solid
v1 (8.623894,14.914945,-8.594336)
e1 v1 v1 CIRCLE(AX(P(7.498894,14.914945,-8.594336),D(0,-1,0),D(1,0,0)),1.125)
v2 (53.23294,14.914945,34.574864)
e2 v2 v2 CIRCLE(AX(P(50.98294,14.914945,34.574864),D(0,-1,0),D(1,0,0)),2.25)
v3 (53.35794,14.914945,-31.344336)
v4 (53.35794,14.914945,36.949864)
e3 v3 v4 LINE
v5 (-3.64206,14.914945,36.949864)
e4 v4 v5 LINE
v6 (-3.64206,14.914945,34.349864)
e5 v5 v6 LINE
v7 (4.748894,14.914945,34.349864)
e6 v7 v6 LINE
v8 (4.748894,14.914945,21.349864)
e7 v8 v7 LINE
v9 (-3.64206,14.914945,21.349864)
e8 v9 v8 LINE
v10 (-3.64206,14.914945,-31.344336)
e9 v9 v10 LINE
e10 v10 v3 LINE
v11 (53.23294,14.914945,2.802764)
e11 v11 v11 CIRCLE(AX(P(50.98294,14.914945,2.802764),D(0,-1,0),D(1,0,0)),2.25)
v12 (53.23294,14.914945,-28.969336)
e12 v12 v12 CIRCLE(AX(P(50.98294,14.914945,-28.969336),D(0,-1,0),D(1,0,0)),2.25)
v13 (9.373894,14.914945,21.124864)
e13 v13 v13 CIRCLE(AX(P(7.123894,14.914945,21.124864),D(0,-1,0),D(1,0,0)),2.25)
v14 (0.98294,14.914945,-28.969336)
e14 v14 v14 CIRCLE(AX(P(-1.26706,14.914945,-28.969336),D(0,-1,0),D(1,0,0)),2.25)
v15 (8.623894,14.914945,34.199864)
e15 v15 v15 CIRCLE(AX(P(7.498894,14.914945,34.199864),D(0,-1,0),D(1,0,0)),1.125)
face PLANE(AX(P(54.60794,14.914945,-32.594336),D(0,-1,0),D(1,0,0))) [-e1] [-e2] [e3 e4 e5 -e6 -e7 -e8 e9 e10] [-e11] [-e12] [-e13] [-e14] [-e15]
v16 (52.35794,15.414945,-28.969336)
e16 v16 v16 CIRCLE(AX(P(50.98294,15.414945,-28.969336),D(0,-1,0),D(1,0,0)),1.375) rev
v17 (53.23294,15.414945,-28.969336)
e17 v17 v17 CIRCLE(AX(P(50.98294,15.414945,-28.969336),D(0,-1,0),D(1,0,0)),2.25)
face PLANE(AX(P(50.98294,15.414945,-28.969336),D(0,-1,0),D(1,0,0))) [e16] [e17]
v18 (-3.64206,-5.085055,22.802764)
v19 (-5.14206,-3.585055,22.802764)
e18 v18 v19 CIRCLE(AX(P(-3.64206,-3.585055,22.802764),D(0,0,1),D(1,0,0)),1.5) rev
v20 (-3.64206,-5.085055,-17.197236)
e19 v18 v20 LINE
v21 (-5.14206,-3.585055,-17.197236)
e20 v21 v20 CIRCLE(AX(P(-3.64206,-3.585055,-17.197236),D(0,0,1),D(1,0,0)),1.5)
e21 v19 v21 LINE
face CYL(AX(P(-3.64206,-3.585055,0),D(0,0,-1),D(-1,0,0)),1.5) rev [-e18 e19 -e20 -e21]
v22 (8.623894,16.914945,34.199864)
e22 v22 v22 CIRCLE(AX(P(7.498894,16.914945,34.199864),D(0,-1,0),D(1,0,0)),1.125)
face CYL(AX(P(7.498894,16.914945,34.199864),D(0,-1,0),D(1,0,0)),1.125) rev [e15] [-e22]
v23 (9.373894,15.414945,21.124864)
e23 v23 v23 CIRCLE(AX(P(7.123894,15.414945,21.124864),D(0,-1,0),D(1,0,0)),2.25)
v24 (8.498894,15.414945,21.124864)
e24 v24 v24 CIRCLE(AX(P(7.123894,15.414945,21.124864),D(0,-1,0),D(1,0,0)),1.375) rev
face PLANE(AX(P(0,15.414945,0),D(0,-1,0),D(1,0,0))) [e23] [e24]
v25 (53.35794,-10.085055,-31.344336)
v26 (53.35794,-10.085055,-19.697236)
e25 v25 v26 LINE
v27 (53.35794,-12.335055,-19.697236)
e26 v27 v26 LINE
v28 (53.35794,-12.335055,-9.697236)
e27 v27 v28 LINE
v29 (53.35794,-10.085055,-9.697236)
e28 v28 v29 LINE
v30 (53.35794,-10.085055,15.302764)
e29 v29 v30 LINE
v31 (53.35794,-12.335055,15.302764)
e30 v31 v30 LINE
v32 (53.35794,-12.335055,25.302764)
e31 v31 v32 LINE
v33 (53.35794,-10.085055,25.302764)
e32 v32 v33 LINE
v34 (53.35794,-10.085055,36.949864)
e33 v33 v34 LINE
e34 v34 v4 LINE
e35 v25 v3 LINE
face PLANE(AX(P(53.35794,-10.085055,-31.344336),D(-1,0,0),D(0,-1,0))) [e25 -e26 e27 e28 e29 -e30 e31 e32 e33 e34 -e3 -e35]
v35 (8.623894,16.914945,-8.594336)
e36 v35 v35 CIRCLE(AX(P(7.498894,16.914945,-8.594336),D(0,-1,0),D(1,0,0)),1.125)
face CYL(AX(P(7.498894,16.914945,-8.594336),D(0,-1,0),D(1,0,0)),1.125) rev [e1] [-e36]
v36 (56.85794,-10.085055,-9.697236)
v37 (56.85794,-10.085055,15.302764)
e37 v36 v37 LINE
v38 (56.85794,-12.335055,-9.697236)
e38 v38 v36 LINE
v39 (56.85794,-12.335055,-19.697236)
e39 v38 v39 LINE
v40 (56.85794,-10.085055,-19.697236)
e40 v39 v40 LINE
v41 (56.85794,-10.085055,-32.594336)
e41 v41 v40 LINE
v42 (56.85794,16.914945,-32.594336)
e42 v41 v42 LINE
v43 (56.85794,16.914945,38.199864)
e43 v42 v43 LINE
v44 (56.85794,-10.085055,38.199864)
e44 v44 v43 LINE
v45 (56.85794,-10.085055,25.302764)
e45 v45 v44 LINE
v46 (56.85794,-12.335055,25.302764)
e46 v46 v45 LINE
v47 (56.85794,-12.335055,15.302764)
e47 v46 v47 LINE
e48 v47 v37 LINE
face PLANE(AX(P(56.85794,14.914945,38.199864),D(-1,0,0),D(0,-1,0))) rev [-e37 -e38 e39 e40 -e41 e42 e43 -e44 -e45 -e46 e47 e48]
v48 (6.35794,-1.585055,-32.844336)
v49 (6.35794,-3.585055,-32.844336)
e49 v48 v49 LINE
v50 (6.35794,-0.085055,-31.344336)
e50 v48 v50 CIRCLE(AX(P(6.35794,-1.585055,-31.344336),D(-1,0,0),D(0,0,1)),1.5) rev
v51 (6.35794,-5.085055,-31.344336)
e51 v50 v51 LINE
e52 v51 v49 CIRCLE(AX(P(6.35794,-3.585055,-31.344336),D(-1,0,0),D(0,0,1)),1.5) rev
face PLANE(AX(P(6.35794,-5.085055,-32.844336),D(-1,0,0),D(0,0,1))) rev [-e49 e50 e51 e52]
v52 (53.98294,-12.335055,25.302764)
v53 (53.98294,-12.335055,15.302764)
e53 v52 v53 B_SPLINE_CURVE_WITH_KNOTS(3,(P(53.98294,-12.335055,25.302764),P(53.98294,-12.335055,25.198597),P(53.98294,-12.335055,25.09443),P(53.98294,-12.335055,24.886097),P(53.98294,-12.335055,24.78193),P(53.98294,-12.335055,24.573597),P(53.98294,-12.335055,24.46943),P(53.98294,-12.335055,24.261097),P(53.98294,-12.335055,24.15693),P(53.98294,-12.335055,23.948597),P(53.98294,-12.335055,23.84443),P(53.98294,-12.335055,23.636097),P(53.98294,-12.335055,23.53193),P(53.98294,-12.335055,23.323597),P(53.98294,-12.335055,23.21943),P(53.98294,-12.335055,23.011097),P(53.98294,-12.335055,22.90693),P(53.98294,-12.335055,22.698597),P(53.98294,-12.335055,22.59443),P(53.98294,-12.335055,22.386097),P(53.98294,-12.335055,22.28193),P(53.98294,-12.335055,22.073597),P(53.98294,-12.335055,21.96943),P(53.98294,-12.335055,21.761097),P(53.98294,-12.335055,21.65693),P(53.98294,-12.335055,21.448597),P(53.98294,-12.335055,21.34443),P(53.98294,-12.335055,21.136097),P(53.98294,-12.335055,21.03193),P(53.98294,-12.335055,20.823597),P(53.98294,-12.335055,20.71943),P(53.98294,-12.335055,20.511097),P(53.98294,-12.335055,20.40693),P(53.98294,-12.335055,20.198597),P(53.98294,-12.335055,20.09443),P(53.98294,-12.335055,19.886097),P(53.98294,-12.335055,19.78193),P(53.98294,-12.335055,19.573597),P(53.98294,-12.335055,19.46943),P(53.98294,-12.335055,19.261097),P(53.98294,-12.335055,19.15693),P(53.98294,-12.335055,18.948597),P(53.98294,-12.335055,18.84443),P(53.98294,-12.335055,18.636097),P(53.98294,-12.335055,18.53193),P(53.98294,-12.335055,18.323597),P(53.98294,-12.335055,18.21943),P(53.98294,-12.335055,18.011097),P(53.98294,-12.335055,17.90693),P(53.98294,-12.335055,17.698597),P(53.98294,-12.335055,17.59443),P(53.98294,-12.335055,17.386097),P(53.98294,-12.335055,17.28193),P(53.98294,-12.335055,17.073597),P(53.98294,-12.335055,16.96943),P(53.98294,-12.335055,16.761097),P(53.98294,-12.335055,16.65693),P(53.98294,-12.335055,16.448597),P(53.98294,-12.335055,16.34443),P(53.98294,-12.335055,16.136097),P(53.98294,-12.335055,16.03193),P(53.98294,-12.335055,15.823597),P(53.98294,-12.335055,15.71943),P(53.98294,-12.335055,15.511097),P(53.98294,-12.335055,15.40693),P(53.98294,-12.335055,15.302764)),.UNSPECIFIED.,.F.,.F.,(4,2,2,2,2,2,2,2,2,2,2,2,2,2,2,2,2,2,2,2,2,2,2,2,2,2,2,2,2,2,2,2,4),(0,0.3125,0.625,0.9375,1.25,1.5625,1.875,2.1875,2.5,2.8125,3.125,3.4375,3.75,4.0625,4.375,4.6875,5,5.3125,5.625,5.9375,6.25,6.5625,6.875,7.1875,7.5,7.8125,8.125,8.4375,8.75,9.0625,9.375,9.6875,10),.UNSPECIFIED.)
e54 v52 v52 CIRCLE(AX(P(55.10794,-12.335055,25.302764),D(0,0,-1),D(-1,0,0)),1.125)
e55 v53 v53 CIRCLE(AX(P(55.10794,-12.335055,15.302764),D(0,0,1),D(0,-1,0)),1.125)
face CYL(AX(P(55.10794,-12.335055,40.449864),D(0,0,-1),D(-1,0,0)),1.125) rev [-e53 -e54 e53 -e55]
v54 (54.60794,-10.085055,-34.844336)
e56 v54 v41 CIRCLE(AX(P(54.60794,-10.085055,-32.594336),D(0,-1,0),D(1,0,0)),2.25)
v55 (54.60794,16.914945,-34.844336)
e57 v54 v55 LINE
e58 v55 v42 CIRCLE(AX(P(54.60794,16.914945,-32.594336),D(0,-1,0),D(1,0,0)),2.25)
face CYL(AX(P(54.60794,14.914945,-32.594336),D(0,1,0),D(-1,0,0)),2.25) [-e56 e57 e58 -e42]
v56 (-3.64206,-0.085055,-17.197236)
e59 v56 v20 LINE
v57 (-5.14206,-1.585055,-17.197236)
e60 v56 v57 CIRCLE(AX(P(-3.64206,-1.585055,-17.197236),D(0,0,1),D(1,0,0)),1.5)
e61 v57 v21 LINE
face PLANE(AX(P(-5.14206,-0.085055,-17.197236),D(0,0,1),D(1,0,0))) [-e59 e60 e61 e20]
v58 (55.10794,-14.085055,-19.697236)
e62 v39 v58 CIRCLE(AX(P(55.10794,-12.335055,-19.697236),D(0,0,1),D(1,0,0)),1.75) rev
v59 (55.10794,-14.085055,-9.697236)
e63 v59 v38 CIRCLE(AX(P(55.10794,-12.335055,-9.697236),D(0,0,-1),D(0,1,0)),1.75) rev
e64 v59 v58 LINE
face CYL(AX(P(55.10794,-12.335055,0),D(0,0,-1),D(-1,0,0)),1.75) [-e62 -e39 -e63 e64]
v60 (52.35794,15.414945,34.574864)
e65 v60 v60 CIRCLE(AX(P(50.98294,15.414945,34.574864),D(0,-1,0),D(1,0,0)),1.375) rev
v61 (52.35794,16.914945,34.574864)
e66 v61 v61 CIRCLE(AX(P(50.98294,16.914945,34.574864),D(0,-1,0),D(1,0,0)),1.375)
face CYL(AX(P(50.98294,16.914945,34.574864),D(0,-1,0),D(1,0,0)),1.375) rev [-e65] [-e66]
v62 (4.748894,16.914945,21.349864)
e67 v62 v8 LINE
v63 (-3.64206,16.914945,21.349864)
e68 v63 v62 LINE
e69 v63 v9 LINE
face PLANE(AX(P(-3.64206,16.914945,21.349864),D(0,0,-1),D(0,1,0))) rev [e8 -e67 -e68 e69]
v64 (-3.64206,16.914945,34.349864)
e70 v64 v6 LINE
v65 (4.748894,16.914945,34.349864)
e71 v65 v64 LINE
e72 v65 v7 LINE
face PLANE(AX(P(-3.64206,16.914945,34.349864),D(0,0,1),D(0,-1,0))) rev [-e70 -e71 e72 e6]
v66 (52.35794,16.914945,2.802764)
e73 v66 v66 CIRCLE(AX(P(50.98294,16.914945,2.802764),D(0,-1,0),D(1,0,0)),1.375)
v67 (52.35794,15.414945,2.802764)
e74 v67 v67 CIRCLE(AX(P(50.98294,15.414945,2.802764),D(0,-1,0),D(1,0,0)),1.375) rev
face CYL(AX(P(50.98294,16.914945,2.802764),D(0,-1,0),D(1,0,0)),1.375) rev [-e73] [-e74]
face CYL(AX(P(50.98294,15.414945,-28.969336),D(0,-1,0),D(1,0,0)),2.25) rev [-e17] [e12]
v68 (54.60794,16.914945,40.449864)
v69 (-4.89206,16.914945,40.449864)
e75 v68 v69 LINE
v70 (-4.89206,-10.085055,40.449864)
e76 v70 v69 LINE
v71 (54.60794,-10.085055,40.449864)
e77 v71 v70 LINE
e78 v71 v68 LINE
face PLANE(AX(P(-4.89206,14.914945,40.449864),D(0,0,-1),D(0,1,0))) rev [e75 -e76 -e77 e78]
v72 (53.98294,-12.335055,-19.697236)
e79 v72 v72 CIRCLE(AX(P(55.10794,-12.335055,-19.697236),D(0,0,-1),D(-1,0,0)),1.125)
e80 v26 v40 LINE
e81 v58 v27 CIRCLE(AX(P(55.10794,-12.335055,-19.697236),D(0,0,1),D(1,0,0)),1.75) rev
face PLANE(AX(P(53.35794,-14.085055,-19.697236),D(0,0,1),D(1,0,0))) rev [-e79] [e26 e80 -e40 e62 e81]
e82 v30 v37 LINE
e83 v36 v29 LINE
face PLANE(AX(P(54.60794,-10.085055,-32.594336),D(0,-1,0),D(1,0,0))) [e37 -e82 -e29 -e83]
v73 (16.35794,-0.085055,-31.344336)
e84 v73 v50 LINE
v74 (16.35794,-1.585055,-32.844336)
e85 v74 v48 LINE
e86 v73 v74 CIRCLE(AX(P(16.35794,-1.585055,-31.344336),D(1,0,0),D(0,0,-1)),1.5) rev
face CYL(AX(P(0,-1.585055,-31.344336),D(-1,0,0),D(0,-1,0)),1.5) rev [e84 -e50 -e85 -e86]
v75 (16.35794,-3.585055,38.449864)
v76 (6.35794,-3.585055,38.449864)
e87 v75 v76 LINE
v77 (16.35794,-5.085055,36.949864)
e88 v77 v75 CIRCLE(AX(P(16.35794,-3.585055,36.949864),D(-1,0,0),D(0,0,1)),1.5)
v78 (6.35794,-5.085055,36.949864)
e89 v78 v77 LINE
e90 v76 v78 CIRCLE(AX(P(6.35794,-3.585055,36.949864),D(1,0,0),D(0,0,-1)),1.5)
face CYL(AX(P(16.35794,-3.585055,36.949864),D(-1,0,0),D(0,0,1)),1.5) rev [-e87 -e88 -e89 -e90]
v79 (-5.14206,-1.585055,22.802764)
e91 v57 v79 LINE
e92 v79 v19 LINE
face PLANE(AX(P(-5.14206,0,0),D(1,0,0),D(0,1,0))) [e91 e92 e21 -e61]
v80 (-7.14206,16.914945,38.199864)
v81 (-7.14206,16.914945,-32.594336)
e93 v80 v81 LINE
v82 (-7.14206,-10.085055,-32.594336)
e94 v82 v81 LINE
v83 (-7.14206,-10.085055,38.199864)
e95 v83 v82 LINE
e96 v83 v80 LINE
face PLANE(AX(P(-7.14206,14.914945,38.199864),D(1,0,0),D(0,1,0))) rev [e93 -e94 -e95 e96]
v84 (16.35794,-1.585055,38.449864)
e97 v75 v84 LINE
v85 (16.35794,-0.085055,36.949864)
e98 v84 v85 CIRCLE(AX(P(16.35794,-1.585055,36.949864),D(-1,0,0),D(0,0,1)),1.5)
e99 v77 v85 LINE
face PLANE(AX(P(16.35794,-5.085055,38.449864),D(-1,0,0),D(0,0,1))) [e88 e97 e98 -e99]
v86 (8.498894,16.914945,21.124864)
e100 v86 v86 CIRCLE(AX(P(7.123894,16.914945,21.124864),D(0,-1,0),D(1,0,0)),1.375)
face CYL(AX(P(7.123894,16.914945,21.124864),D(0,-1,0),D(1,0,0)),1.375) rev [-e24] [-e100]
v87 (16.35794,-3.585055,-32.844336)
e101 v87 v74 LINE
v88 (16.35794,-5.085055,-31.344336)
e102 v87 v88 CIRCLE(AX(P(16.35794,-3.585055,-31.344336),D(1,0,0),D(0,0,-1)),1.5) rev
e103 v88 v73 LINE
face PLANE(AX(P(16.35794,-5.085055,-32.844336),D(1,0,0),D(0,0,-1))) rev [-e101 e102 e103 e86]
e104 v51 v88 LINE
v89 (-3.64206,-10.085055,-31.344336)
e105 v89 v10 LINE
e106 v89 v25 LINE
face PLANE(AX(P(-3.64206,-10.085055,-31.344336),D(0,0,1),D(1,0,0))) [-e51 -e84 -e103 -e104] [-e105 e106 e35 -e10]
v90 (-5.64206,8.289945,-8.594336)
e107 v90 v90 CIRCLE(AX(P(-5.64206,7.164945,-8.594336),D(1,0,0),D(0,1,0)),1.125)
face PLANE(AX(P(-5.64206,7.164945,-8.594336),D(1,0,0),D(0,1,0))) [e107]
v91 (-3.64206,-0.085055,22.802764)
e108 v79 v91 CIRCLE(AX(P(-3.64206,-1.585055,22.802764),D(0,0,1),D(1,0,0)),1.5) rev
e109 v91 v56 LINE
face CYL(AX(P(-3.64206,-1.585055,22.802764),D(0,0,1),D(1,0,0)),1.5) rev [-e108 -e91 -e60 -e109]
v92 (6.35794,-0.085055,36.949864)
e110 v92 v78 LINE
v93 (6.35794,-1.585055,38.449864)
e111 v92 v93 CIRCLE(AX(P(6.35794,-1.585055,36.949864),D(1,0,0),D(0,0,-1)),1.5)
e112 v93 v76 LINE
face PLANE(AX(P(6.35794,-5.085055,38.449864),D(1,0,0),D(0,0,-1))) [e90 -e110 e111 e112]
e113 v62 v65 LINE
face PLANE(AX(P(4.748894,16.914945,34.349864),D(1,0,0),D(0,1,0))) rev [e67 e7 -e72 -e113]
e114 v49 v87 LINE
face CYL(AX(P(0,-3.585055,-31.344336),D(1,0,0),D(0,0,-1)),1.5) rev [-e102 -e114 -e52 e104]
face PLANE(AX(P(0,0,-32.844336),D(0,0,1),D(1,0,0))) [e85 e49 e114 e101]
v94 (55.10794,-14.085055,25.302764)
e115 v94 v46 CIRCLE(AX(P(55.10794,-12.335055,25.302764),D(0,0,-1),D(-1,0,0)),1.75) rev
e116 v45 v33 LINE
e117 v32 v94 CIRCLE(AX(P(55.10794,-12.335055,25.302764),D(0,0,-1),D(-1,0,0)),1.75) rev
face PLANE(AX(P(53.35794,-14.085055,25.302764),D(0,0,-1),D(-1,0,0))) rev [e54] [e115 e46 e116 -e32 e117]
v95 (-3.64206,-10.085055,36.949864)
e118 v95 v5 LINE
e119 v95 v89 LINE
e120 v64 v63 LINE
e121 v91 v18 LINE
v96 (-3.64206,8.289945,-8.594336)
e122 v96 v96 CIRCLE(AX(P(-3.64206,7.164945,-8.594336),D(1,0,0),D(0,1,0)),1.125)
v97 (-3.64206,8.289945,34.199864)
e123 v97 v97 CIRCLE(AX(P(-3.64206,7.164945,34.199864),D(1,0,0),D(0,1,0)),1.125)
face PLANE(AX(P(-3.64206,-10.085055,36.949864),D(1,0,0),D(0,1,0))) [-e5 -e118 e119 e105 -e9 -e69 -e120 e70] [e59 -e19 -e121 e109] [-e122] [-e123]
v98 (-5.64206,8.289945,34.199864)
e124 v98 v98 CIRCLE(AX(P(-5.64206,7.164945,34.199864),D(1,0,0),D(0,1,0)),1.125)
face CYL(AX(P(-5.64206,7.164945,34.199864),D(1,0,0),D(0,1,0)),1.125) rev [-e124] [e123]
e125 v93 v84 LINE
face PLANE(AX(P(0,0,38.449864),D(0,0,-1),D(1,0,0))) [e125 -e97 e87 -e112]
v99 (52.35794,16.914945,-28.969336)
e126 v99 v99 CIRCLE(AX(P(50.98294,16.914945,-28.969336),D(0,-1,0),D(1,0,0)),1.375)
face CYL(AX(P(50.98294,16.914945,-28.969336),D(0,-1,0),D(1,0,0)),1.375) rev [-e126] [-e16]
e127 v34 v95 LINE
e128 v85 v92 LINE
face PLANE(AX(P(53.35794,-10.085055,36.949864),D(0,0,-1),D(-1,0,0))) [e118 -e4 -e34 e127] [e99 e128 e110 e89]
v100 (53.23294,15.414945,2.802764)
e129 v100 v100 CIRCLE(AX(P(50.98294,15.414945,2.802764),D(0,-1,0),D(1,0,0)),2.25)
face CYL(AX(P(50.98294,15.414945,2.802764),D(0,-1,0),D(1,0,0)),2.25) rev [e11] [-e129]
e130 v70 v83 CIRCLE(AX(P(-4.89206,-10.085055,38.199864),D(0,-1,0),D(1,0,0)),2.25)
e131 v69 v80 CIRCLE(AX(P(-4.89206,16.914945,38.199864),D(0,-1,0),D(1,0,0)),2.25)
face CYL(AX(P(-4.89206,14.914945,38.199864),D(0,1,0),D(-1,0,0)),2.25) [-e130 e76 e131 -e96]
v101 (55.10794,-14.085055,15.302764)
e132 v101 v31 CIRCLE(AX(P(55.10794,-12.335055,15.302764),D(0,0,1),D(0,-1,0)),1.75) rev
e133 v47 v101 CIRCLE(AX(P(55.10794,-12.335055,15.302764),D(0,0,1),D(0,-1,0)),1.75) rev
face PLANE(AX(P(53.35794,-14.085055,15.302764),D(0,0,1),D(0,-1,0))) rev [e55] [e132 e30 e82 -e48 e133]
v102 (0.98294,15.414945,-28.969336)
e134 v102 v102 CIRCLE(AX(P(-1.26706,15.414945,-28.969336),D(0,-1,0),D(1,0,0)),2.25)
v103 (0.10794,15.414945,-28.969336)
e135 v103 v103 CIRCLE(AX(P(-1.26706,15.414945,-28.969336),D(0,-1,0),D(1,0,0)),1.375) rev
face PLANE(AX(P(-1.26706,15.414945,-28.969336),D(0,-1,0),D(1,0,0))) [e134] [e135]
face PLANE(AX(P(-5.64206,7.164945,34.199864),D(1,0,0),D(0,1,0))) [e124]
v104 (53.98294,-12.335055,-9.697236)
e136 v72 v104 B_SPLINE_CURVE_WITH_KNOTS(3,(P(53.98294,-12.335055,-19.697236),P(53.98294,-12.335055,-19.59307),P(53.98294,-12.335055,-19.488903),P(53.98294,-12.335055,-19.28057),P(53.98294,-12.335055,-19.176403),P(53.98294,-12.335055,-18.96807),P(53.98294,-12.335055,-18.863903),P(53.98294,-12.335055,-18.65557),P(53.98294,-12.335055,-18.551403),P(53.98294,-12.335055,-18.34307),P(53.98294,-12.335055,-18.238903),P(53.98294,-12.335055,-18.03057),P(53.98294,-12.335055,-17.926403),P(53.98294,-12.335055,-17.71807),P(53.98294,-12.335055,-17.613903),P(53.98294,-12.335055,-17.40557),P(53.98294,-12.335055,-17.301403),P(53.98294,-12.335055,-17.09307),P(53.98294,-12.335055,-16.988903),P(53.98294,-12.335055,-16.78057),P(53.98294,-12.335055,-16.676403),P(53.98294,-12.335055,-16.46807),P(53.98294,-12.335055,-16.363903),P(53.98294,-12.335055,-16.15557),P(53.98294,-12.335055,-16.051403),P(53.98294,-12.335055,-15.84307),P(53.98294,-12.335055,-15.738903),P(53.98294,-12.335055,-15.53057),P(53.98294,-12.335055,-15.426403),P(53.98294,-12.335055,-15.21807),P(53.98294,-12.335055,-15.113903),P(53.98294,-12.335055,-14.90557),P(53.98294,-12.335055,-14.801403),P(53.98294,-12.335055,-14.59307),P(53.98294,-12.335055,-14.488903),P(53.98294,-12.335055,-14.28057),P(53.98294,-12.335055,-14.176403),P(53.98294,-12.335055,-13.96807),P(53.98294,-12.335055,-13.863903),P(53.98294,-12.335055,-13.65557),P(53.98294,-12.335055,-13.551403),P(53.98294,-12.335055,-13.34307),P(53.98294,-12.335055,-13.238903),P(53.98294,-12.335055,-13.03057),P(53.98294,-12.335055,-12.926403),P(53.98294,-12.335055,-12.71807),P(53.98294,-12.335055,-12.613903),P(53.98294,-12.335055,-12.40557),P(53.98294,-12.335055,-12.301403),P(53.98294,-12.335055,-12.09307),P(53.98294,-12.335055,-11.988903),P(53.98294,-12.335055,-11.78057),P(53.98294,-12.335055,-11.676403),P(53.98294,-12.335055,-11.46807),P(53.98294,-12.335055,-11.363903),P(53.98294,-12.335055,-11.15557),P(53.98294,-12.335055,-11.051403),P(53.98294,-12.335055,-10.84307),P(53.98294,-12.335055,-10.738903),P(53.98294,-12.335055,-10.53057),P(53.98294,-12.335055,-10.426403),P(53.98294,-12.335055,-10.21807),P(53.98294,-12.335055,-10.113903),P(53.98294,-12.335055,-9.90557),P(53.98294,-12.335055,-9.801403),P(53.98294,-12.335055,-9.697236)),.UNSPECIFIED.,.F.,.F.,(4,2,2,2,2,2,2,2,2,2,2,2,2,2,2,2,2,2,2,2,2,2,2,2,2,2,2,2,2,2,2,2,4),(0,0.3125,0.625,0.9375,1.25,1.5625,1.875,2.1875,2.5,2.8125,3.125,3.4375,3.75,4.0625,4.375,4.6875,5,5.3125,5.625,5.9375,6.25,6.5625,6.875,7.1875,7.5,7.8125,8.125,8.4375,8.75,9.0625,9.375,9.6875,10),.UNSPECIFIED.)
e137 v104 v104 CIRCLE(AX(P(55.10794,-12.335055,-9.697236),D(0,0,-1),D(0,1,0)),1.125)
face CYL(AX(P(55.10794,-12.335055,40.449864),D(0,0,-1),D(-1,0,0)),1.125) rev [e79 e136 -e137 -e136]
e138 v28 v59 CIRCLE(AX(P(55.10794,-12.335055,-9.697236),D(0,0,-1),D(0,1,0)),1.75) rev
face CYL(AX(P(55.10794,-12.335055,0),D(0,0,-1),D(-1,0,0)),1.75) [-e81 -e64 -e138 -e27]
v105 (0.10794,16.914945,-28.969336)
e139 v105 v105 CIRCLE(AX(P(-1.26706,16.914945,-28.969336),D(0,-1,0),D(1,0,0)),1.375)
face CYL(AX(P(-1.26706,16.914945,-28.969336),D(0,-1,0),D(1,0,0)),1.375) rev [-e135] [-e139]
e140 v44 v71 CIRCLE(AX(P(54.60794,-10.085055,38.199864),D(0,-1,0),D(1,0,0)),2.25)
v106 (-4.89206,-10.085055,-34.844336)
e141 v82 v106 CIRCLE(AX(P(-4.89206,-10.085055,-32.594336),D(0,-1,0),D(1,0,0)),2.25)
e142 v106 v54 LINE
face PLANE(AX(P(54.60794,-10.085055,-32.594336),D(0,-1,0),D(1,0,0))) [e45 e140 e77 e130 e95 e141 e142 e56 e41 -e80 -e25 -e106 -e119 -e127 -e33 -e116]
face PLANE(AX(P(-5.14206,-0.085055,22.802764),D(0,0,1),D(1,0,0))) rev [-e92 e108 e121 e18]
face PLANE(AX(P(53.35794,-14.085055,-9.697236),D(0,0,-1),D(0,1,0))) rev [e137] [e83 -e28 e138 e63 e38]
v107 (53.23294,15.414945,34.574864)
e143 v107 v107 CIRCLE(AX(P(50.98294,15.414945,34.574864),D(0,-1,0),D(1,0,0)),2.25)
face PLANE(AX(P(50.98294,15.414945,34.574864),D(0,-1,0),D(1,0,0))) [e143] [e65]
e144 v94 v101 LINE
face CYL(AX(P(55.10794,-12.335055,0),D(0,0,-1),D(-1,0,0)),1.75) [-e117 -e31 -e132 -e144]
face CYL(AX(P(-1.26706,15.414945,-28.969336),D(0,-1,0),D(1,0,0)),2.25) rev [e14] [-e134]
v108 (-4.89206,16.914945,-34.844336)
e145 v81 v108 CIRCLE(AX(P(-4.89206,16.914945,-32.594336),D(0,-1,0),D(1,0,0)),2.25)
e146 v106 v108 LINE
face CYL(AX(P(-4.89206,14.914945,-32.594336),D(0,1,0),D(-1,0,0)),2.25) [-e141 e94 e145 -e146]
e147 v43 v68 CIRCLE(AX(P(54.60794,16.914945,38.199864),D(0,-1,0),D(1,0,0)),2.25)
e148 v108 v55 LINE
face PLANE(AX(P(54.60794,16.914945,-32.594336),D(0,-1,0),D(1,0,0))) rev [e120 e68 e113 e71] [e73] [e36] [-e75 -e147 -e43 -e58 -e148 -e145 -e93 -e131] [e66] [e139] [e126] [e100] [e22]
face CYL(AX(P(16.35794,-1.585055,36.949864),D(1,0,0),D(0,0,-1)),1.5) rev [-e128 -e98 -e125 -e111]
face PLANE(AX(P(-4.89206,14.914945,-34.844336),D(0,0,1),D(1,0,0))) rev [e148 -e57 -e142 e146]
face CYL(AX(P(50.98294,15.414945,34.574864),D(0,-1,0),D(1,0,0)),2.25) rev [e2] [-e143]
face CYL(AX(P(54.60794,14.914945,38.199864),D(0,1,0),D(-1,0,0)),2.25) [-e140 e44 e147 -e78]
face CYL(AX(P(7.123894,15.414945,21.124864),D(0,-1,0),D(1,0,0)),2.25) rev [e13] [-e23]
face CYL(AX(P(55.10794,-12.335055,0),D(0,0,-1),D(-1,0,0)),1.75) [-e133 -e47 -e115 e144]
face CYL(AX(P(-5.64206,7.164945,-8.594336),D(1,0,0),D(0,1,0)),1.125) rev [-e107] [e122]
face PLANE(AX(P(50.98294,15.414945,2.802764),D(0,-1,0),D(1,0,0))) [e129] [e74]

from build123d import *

# Parameters (mm, degrees)
EXTRUDE_BASE_DEPTH              = 2
SKETCH2_W                       = 57
SKETCH2_H                       = 68.2942
EXTRUDE_WALLS_DEPTH             = 25
SKETCH3_W                       = 8.390953786
SKETCH3_H                       = 13
CUT_USB_HOLE_DEPTH              = 75.121635616
SKETCH4_R                       = 1.375
CUT_CONNECTING_THRU_HOLES_DEPTH = 75.121635616
SKETCH5_R                       = 2.25
SKETCH5_R_2                     = 1.375
CUT_EXTRUDE3_DEPTH              = 0.5
SKETCH6_R                       = 1.125
CUT_CABLE_COVER_BOTTOM_DEPTH    = 75.121635616
SKETCH7_R                       = 1.125
CUT_CABLE_COVER_SIDE_DEPTH      = 2
SKETCH8_W                       = 3.5
SKETCH8_H                       = 10
EXTRUDE_HINGE_DEPTH             = 4
SKETCH9_R                       = 1.125
CUT_HINGE_HOLE_DEPTH            = 85.478484791
FILLET_HINGE_R                  = 1.75
SKETCH10_W                      = 40
SKETCH10_H                      = 5
CUT_NOTCH_DEPTH                 = 1.5
SKETCH11_W                      = 10
SKETCH11_H                      = 5
CUT_SIDE_NOTCH_DEPTH            = 1.5
FILLET_NOTCH_R                  = 1.5


with BuildPart() as part:
    # Sketch1 → Extrude Base (new body)
    with BuildSketch(Plane.XZ.offset(-16.914945084)):
        with BuildLine():
            Line((56.857940404, 38.199863775), (56.857940404, -32.594336225))
            ThreePointArc((56.857940404, -32.594336225), (56.198930662, -34.185326483), (54.607940404, -34.844336225))
            Line((54.607940404, -34.844336225), (-4.892059596, -34.844336225))
            ThreePointArc((-4.892059596, -34.844336225), (-6.483049854, -34.185326483), (-7.142059596, -32.594336225))
            Line((-7.142059596, -32.594336225), (-7.142059596, 38.199863775))
            ThreePointArc((-7.142059596, 38.199863775), (-6.483049854, 39.790854032), (-4.892059596, 40.449863775))
            Line((-4.892059596, 40.449863775), (54.607940404, 40.449863775))
            ThreePointArc((54.607940404, 40.449863775), (56.198930662, 39.790854032), (56.857940404, 38.199863775))
        make_face()
    extrude(amount=EXTRUDE_BASE_DEPTH)

    # Sketch2 → Extrude Walls (add)
    with BuildSketch(Plane.XZ.offset(-14.914945084)):
        with BuildLine():
            Line((56.857940404, -32.594336225), (56.857940404, 38.199863775))
            ThreePointArc((56.857940404, 38.199863775), (56.198930662, 39.790854032), (54.607940404, 40.449863775))
            Line((54.607940404, 40.449863775), (-4.892059596, 40.449863775))
            ThreePointArc((-4.892059596, 40.449863775), (-6.483049854, 39.790854032), (-7.142059596, 38.199863775))
            Line((-7.142059596, 38.199863775), (-7.142059596, -32.594336225))
            ThreePointArc((-7.142059596, -32.594336225), (-6.483049854, -34.185326483), (-4.892059596, -34.844336225))
            Line((-4.892059596, -34.844336225), (54.607940404, -34.844336225))
            ThreePointArc((54.607940404, -34.844336225), (56.198930662, -34.185326483), (56.857940404, -32.594336225))
        make_face()
        with Locations((24.857940404, 2.802763775)):
            Rectangle(SKETCH2_W, SKETCH2_H, mode=Mode.SUBTRACT)
    extrude(amount=EXTRUDE_WALLS_DEPTH)

    # Sketch3 → Cut USB Hole (cut, through all)
    with BuildSketch(Plane.XZ.offset(-14.914945084)):
        with Locations((0.553417297, 27.849863775)):
            Rectangle(SKETCH3_W, SKETCH3_H)
    extrude(amount=-CUT_USB_HOLE_DEPTH, mode=Mode.SUBTRACT)

    # Sketch4 → Cut Connecting Thru Holes (cut, through all)
    with BuildSketch(Plane.XZ.offset(-14.914945084)):
        with Locations((50.982940404, 34.574863775)):
            Circle(SKETCH4_R)
        with Locations((50.982940404, -28.969336225)):
            Circle(SKETCH4_R)
        with Locations((-1.267059596, -28.969336225)):
            Circle(SKETCH4_R)
        with Locations((50.982940404, 2.802763775)):
            Circle(SKETCH4_R)
        with Locations((7.12389419, 21.124863775)):
            Circle(SKETCH4_R)
    extrude(amount=-CUT_CONNECTING_THRU_HOLES_DEPTH, mode=Mode.SUBTRACT)

    # Sketch5 → Cut-Extrude3 (cut)
    # profile 1 of 5: a face of its own
    with BuildSketch(Plane.XZ.offset(-14.914945084)):
        with Locations((7.12389419, 21.124863775)):
            Circle(SKETCH5_R)
        with Locations((7.12389419, 21.124863775)):
            Circle(SKETCH5_R_2, mode=Mode.SUBTRACT)
    # profile 2 of 5: a face of its own
    with BuildSketch(Plane.XZ.offset(-14.914945084)):
        with Locations((50.982940404, 34.574863775)):
            Circle(SKETCH5_R)
    # profile 3 of 5: a face of its own
    with BuildSketch(Plane.XZ.offset(-14.914945084)):
        with Locations((50.982940404, 2.802763775)):
            Circle(SKETCH5_R)
    # profile 4 of 5: a face of its own
    with BuildSketch(Plane.XZ.offset(-14.914945084)):
        with Locations((50.982940404, -28.969336225)):
            Circle(SKETCH5_R)
    # profile 5 of 5: a face of its own
    with BuildSketch(Plane.XZ.offset(-14.914945084)):
        with Locations((-1.267059596, -28.969336225)):
            Circle(SKETCH5_R)
    extrude(amount=-CUT_EXTRUDE3_DEPTH, mode=Mode.SUBTRACT)

    # Sketch6 → Cut Cable Cover Bottom (cut, through all)
    with BuildSketch(Plane.XZ.offset(-14.914945084)):
        with Locations((7.49889419, 34.199863775)):
            Circle(SKETCH6_R)
        with Locations((7.49889419, -8.594336225)):
            Circle(SKETCH6_R)
    extrude(amount=-CUT_CABLE_COVER_BOTTOM_DEPTH, mode=Mode.SUBTRACT)

    # Sketch7 → Cut Cable Cover Side (cut)
    with BuildSketch(Plane(origin=(-3.642059596, 0, 0), x_dir=(0, 0, -1), z_dir=(1, 0, 0))):
        with Locations(Location((8.594336225, 7.164945084, 0), (0, 0, 90))):
            Circle(SKETCH7_R)
        with Locations(Location((-34.199863775, 7.164945084, 0), (0, 0, 90))):
            Circle(SKETCH7_R)
    extrude(amount=-CUT_CABLE_COVER_SIDE_DEPTH, mode=Mode.SUBTRACT)

    # Sketch8 → Extrude Hinge (add)
    with BuildSketch(Plane.XZ.offset(10.085054916)):
        with Locations((55.107940404, -14.697236225)):
            Rectangle(SKETCH8_W, SKETCH8_H)
        with Locations((55.107940404, 20.302763775)):
            Rectangle(SKETCH8_W, SKETCH8_H)
    extrude(amount=EXTRUDE_HINGE_DEPTH)

    # Sketch9 → Cut Hinge Hole (cut, through all)
    with BuildSketch(Plane(origin=(0, 0, -19.697236225), x_dir=(-1, 0, 0), z_dir=(0, 0, -1))):
        with Locations((-55.107940404, -12.335054916)):
            Circle(SKETCH9_R)
    extrude(amount=-CUT_HINGE_HOLE_DEPTH, mode=Mode.SUBTRACT)

    # Fillet Hinge
    fillet_hinge_edges = [part.edges().sort_by_distance(p)[0] for p in [
        (56.857940404, -14.085054916, 20.302763775),
        (53.357940404, -14.085054916, 20.302763775),
        (56.857940404, -14.085054916, -14.697236225),
        (53.357940404, -14.085054916, -14.697236225),
    ]]
    fillet(fillet_hinge_edges, radius=FILLET_HINGE_R - 0.0001)  # a hair under: the kernel refuses the full size

    # Sketch10 → Cut Notch (cut)
    with BuildSketch(Plane(origin=(-3.642059596, 0, 0), x_dir=(0, 0, -1), z_dir=(1, 0, 0))):
        with Locations((-2.802763775, -2.585054916)):
            Rectangle(SKETCH10_W, SKETCH10_H)
    extrude(amount=-CUT_NOTCH_DEPTH, mode=Mode.SUBTRACT)

    # Sketch11 → Cut Side Notch (cut)
    with BuildSketch(Plane.XY.offset(-31.344336225)):
        with Locations((11.357940404, -2.585054916)):
            Rectangle(SKETCH11_W, SKETCH11_H)
    cut_side_notch = extrude(amount=-CUT_SIDE_NOTCH_DEPTH, mode=Mode.SUBTRACT)

    # Mirror Side Notch: Cut Side Notch across plane
    add(cut_side_notch.mirror(Plane(origin=(0, 0, 2.802763775), x_dir=(1, 0, 0), z_dir=(0, 0, -1))), mode=Mode.SUBTRACT)

    # Fillet Notch
    fillet_notch_edges = [part.edges().sort_by_distance(p)[0] for p in [
        (-5.142059596, -5.085054916, 2.802763775),
        (-5.142059596, -0.085054916, 2.802763775),
        (11.357940404, -5.085054916, -32.844336225),
        (11.357940404, -0.085054916, -32.844336225),
        (11.357940404, -5.085054916, 38.449863775),
        (11.357940404, -0.085054916, 38.449863775),
    ]]
    fillet(fillet_notch_edges, radius=FILLET_NOTCH_R - 0.0001)  # a hair under: the kernel refuses the full size


solid = part.part
